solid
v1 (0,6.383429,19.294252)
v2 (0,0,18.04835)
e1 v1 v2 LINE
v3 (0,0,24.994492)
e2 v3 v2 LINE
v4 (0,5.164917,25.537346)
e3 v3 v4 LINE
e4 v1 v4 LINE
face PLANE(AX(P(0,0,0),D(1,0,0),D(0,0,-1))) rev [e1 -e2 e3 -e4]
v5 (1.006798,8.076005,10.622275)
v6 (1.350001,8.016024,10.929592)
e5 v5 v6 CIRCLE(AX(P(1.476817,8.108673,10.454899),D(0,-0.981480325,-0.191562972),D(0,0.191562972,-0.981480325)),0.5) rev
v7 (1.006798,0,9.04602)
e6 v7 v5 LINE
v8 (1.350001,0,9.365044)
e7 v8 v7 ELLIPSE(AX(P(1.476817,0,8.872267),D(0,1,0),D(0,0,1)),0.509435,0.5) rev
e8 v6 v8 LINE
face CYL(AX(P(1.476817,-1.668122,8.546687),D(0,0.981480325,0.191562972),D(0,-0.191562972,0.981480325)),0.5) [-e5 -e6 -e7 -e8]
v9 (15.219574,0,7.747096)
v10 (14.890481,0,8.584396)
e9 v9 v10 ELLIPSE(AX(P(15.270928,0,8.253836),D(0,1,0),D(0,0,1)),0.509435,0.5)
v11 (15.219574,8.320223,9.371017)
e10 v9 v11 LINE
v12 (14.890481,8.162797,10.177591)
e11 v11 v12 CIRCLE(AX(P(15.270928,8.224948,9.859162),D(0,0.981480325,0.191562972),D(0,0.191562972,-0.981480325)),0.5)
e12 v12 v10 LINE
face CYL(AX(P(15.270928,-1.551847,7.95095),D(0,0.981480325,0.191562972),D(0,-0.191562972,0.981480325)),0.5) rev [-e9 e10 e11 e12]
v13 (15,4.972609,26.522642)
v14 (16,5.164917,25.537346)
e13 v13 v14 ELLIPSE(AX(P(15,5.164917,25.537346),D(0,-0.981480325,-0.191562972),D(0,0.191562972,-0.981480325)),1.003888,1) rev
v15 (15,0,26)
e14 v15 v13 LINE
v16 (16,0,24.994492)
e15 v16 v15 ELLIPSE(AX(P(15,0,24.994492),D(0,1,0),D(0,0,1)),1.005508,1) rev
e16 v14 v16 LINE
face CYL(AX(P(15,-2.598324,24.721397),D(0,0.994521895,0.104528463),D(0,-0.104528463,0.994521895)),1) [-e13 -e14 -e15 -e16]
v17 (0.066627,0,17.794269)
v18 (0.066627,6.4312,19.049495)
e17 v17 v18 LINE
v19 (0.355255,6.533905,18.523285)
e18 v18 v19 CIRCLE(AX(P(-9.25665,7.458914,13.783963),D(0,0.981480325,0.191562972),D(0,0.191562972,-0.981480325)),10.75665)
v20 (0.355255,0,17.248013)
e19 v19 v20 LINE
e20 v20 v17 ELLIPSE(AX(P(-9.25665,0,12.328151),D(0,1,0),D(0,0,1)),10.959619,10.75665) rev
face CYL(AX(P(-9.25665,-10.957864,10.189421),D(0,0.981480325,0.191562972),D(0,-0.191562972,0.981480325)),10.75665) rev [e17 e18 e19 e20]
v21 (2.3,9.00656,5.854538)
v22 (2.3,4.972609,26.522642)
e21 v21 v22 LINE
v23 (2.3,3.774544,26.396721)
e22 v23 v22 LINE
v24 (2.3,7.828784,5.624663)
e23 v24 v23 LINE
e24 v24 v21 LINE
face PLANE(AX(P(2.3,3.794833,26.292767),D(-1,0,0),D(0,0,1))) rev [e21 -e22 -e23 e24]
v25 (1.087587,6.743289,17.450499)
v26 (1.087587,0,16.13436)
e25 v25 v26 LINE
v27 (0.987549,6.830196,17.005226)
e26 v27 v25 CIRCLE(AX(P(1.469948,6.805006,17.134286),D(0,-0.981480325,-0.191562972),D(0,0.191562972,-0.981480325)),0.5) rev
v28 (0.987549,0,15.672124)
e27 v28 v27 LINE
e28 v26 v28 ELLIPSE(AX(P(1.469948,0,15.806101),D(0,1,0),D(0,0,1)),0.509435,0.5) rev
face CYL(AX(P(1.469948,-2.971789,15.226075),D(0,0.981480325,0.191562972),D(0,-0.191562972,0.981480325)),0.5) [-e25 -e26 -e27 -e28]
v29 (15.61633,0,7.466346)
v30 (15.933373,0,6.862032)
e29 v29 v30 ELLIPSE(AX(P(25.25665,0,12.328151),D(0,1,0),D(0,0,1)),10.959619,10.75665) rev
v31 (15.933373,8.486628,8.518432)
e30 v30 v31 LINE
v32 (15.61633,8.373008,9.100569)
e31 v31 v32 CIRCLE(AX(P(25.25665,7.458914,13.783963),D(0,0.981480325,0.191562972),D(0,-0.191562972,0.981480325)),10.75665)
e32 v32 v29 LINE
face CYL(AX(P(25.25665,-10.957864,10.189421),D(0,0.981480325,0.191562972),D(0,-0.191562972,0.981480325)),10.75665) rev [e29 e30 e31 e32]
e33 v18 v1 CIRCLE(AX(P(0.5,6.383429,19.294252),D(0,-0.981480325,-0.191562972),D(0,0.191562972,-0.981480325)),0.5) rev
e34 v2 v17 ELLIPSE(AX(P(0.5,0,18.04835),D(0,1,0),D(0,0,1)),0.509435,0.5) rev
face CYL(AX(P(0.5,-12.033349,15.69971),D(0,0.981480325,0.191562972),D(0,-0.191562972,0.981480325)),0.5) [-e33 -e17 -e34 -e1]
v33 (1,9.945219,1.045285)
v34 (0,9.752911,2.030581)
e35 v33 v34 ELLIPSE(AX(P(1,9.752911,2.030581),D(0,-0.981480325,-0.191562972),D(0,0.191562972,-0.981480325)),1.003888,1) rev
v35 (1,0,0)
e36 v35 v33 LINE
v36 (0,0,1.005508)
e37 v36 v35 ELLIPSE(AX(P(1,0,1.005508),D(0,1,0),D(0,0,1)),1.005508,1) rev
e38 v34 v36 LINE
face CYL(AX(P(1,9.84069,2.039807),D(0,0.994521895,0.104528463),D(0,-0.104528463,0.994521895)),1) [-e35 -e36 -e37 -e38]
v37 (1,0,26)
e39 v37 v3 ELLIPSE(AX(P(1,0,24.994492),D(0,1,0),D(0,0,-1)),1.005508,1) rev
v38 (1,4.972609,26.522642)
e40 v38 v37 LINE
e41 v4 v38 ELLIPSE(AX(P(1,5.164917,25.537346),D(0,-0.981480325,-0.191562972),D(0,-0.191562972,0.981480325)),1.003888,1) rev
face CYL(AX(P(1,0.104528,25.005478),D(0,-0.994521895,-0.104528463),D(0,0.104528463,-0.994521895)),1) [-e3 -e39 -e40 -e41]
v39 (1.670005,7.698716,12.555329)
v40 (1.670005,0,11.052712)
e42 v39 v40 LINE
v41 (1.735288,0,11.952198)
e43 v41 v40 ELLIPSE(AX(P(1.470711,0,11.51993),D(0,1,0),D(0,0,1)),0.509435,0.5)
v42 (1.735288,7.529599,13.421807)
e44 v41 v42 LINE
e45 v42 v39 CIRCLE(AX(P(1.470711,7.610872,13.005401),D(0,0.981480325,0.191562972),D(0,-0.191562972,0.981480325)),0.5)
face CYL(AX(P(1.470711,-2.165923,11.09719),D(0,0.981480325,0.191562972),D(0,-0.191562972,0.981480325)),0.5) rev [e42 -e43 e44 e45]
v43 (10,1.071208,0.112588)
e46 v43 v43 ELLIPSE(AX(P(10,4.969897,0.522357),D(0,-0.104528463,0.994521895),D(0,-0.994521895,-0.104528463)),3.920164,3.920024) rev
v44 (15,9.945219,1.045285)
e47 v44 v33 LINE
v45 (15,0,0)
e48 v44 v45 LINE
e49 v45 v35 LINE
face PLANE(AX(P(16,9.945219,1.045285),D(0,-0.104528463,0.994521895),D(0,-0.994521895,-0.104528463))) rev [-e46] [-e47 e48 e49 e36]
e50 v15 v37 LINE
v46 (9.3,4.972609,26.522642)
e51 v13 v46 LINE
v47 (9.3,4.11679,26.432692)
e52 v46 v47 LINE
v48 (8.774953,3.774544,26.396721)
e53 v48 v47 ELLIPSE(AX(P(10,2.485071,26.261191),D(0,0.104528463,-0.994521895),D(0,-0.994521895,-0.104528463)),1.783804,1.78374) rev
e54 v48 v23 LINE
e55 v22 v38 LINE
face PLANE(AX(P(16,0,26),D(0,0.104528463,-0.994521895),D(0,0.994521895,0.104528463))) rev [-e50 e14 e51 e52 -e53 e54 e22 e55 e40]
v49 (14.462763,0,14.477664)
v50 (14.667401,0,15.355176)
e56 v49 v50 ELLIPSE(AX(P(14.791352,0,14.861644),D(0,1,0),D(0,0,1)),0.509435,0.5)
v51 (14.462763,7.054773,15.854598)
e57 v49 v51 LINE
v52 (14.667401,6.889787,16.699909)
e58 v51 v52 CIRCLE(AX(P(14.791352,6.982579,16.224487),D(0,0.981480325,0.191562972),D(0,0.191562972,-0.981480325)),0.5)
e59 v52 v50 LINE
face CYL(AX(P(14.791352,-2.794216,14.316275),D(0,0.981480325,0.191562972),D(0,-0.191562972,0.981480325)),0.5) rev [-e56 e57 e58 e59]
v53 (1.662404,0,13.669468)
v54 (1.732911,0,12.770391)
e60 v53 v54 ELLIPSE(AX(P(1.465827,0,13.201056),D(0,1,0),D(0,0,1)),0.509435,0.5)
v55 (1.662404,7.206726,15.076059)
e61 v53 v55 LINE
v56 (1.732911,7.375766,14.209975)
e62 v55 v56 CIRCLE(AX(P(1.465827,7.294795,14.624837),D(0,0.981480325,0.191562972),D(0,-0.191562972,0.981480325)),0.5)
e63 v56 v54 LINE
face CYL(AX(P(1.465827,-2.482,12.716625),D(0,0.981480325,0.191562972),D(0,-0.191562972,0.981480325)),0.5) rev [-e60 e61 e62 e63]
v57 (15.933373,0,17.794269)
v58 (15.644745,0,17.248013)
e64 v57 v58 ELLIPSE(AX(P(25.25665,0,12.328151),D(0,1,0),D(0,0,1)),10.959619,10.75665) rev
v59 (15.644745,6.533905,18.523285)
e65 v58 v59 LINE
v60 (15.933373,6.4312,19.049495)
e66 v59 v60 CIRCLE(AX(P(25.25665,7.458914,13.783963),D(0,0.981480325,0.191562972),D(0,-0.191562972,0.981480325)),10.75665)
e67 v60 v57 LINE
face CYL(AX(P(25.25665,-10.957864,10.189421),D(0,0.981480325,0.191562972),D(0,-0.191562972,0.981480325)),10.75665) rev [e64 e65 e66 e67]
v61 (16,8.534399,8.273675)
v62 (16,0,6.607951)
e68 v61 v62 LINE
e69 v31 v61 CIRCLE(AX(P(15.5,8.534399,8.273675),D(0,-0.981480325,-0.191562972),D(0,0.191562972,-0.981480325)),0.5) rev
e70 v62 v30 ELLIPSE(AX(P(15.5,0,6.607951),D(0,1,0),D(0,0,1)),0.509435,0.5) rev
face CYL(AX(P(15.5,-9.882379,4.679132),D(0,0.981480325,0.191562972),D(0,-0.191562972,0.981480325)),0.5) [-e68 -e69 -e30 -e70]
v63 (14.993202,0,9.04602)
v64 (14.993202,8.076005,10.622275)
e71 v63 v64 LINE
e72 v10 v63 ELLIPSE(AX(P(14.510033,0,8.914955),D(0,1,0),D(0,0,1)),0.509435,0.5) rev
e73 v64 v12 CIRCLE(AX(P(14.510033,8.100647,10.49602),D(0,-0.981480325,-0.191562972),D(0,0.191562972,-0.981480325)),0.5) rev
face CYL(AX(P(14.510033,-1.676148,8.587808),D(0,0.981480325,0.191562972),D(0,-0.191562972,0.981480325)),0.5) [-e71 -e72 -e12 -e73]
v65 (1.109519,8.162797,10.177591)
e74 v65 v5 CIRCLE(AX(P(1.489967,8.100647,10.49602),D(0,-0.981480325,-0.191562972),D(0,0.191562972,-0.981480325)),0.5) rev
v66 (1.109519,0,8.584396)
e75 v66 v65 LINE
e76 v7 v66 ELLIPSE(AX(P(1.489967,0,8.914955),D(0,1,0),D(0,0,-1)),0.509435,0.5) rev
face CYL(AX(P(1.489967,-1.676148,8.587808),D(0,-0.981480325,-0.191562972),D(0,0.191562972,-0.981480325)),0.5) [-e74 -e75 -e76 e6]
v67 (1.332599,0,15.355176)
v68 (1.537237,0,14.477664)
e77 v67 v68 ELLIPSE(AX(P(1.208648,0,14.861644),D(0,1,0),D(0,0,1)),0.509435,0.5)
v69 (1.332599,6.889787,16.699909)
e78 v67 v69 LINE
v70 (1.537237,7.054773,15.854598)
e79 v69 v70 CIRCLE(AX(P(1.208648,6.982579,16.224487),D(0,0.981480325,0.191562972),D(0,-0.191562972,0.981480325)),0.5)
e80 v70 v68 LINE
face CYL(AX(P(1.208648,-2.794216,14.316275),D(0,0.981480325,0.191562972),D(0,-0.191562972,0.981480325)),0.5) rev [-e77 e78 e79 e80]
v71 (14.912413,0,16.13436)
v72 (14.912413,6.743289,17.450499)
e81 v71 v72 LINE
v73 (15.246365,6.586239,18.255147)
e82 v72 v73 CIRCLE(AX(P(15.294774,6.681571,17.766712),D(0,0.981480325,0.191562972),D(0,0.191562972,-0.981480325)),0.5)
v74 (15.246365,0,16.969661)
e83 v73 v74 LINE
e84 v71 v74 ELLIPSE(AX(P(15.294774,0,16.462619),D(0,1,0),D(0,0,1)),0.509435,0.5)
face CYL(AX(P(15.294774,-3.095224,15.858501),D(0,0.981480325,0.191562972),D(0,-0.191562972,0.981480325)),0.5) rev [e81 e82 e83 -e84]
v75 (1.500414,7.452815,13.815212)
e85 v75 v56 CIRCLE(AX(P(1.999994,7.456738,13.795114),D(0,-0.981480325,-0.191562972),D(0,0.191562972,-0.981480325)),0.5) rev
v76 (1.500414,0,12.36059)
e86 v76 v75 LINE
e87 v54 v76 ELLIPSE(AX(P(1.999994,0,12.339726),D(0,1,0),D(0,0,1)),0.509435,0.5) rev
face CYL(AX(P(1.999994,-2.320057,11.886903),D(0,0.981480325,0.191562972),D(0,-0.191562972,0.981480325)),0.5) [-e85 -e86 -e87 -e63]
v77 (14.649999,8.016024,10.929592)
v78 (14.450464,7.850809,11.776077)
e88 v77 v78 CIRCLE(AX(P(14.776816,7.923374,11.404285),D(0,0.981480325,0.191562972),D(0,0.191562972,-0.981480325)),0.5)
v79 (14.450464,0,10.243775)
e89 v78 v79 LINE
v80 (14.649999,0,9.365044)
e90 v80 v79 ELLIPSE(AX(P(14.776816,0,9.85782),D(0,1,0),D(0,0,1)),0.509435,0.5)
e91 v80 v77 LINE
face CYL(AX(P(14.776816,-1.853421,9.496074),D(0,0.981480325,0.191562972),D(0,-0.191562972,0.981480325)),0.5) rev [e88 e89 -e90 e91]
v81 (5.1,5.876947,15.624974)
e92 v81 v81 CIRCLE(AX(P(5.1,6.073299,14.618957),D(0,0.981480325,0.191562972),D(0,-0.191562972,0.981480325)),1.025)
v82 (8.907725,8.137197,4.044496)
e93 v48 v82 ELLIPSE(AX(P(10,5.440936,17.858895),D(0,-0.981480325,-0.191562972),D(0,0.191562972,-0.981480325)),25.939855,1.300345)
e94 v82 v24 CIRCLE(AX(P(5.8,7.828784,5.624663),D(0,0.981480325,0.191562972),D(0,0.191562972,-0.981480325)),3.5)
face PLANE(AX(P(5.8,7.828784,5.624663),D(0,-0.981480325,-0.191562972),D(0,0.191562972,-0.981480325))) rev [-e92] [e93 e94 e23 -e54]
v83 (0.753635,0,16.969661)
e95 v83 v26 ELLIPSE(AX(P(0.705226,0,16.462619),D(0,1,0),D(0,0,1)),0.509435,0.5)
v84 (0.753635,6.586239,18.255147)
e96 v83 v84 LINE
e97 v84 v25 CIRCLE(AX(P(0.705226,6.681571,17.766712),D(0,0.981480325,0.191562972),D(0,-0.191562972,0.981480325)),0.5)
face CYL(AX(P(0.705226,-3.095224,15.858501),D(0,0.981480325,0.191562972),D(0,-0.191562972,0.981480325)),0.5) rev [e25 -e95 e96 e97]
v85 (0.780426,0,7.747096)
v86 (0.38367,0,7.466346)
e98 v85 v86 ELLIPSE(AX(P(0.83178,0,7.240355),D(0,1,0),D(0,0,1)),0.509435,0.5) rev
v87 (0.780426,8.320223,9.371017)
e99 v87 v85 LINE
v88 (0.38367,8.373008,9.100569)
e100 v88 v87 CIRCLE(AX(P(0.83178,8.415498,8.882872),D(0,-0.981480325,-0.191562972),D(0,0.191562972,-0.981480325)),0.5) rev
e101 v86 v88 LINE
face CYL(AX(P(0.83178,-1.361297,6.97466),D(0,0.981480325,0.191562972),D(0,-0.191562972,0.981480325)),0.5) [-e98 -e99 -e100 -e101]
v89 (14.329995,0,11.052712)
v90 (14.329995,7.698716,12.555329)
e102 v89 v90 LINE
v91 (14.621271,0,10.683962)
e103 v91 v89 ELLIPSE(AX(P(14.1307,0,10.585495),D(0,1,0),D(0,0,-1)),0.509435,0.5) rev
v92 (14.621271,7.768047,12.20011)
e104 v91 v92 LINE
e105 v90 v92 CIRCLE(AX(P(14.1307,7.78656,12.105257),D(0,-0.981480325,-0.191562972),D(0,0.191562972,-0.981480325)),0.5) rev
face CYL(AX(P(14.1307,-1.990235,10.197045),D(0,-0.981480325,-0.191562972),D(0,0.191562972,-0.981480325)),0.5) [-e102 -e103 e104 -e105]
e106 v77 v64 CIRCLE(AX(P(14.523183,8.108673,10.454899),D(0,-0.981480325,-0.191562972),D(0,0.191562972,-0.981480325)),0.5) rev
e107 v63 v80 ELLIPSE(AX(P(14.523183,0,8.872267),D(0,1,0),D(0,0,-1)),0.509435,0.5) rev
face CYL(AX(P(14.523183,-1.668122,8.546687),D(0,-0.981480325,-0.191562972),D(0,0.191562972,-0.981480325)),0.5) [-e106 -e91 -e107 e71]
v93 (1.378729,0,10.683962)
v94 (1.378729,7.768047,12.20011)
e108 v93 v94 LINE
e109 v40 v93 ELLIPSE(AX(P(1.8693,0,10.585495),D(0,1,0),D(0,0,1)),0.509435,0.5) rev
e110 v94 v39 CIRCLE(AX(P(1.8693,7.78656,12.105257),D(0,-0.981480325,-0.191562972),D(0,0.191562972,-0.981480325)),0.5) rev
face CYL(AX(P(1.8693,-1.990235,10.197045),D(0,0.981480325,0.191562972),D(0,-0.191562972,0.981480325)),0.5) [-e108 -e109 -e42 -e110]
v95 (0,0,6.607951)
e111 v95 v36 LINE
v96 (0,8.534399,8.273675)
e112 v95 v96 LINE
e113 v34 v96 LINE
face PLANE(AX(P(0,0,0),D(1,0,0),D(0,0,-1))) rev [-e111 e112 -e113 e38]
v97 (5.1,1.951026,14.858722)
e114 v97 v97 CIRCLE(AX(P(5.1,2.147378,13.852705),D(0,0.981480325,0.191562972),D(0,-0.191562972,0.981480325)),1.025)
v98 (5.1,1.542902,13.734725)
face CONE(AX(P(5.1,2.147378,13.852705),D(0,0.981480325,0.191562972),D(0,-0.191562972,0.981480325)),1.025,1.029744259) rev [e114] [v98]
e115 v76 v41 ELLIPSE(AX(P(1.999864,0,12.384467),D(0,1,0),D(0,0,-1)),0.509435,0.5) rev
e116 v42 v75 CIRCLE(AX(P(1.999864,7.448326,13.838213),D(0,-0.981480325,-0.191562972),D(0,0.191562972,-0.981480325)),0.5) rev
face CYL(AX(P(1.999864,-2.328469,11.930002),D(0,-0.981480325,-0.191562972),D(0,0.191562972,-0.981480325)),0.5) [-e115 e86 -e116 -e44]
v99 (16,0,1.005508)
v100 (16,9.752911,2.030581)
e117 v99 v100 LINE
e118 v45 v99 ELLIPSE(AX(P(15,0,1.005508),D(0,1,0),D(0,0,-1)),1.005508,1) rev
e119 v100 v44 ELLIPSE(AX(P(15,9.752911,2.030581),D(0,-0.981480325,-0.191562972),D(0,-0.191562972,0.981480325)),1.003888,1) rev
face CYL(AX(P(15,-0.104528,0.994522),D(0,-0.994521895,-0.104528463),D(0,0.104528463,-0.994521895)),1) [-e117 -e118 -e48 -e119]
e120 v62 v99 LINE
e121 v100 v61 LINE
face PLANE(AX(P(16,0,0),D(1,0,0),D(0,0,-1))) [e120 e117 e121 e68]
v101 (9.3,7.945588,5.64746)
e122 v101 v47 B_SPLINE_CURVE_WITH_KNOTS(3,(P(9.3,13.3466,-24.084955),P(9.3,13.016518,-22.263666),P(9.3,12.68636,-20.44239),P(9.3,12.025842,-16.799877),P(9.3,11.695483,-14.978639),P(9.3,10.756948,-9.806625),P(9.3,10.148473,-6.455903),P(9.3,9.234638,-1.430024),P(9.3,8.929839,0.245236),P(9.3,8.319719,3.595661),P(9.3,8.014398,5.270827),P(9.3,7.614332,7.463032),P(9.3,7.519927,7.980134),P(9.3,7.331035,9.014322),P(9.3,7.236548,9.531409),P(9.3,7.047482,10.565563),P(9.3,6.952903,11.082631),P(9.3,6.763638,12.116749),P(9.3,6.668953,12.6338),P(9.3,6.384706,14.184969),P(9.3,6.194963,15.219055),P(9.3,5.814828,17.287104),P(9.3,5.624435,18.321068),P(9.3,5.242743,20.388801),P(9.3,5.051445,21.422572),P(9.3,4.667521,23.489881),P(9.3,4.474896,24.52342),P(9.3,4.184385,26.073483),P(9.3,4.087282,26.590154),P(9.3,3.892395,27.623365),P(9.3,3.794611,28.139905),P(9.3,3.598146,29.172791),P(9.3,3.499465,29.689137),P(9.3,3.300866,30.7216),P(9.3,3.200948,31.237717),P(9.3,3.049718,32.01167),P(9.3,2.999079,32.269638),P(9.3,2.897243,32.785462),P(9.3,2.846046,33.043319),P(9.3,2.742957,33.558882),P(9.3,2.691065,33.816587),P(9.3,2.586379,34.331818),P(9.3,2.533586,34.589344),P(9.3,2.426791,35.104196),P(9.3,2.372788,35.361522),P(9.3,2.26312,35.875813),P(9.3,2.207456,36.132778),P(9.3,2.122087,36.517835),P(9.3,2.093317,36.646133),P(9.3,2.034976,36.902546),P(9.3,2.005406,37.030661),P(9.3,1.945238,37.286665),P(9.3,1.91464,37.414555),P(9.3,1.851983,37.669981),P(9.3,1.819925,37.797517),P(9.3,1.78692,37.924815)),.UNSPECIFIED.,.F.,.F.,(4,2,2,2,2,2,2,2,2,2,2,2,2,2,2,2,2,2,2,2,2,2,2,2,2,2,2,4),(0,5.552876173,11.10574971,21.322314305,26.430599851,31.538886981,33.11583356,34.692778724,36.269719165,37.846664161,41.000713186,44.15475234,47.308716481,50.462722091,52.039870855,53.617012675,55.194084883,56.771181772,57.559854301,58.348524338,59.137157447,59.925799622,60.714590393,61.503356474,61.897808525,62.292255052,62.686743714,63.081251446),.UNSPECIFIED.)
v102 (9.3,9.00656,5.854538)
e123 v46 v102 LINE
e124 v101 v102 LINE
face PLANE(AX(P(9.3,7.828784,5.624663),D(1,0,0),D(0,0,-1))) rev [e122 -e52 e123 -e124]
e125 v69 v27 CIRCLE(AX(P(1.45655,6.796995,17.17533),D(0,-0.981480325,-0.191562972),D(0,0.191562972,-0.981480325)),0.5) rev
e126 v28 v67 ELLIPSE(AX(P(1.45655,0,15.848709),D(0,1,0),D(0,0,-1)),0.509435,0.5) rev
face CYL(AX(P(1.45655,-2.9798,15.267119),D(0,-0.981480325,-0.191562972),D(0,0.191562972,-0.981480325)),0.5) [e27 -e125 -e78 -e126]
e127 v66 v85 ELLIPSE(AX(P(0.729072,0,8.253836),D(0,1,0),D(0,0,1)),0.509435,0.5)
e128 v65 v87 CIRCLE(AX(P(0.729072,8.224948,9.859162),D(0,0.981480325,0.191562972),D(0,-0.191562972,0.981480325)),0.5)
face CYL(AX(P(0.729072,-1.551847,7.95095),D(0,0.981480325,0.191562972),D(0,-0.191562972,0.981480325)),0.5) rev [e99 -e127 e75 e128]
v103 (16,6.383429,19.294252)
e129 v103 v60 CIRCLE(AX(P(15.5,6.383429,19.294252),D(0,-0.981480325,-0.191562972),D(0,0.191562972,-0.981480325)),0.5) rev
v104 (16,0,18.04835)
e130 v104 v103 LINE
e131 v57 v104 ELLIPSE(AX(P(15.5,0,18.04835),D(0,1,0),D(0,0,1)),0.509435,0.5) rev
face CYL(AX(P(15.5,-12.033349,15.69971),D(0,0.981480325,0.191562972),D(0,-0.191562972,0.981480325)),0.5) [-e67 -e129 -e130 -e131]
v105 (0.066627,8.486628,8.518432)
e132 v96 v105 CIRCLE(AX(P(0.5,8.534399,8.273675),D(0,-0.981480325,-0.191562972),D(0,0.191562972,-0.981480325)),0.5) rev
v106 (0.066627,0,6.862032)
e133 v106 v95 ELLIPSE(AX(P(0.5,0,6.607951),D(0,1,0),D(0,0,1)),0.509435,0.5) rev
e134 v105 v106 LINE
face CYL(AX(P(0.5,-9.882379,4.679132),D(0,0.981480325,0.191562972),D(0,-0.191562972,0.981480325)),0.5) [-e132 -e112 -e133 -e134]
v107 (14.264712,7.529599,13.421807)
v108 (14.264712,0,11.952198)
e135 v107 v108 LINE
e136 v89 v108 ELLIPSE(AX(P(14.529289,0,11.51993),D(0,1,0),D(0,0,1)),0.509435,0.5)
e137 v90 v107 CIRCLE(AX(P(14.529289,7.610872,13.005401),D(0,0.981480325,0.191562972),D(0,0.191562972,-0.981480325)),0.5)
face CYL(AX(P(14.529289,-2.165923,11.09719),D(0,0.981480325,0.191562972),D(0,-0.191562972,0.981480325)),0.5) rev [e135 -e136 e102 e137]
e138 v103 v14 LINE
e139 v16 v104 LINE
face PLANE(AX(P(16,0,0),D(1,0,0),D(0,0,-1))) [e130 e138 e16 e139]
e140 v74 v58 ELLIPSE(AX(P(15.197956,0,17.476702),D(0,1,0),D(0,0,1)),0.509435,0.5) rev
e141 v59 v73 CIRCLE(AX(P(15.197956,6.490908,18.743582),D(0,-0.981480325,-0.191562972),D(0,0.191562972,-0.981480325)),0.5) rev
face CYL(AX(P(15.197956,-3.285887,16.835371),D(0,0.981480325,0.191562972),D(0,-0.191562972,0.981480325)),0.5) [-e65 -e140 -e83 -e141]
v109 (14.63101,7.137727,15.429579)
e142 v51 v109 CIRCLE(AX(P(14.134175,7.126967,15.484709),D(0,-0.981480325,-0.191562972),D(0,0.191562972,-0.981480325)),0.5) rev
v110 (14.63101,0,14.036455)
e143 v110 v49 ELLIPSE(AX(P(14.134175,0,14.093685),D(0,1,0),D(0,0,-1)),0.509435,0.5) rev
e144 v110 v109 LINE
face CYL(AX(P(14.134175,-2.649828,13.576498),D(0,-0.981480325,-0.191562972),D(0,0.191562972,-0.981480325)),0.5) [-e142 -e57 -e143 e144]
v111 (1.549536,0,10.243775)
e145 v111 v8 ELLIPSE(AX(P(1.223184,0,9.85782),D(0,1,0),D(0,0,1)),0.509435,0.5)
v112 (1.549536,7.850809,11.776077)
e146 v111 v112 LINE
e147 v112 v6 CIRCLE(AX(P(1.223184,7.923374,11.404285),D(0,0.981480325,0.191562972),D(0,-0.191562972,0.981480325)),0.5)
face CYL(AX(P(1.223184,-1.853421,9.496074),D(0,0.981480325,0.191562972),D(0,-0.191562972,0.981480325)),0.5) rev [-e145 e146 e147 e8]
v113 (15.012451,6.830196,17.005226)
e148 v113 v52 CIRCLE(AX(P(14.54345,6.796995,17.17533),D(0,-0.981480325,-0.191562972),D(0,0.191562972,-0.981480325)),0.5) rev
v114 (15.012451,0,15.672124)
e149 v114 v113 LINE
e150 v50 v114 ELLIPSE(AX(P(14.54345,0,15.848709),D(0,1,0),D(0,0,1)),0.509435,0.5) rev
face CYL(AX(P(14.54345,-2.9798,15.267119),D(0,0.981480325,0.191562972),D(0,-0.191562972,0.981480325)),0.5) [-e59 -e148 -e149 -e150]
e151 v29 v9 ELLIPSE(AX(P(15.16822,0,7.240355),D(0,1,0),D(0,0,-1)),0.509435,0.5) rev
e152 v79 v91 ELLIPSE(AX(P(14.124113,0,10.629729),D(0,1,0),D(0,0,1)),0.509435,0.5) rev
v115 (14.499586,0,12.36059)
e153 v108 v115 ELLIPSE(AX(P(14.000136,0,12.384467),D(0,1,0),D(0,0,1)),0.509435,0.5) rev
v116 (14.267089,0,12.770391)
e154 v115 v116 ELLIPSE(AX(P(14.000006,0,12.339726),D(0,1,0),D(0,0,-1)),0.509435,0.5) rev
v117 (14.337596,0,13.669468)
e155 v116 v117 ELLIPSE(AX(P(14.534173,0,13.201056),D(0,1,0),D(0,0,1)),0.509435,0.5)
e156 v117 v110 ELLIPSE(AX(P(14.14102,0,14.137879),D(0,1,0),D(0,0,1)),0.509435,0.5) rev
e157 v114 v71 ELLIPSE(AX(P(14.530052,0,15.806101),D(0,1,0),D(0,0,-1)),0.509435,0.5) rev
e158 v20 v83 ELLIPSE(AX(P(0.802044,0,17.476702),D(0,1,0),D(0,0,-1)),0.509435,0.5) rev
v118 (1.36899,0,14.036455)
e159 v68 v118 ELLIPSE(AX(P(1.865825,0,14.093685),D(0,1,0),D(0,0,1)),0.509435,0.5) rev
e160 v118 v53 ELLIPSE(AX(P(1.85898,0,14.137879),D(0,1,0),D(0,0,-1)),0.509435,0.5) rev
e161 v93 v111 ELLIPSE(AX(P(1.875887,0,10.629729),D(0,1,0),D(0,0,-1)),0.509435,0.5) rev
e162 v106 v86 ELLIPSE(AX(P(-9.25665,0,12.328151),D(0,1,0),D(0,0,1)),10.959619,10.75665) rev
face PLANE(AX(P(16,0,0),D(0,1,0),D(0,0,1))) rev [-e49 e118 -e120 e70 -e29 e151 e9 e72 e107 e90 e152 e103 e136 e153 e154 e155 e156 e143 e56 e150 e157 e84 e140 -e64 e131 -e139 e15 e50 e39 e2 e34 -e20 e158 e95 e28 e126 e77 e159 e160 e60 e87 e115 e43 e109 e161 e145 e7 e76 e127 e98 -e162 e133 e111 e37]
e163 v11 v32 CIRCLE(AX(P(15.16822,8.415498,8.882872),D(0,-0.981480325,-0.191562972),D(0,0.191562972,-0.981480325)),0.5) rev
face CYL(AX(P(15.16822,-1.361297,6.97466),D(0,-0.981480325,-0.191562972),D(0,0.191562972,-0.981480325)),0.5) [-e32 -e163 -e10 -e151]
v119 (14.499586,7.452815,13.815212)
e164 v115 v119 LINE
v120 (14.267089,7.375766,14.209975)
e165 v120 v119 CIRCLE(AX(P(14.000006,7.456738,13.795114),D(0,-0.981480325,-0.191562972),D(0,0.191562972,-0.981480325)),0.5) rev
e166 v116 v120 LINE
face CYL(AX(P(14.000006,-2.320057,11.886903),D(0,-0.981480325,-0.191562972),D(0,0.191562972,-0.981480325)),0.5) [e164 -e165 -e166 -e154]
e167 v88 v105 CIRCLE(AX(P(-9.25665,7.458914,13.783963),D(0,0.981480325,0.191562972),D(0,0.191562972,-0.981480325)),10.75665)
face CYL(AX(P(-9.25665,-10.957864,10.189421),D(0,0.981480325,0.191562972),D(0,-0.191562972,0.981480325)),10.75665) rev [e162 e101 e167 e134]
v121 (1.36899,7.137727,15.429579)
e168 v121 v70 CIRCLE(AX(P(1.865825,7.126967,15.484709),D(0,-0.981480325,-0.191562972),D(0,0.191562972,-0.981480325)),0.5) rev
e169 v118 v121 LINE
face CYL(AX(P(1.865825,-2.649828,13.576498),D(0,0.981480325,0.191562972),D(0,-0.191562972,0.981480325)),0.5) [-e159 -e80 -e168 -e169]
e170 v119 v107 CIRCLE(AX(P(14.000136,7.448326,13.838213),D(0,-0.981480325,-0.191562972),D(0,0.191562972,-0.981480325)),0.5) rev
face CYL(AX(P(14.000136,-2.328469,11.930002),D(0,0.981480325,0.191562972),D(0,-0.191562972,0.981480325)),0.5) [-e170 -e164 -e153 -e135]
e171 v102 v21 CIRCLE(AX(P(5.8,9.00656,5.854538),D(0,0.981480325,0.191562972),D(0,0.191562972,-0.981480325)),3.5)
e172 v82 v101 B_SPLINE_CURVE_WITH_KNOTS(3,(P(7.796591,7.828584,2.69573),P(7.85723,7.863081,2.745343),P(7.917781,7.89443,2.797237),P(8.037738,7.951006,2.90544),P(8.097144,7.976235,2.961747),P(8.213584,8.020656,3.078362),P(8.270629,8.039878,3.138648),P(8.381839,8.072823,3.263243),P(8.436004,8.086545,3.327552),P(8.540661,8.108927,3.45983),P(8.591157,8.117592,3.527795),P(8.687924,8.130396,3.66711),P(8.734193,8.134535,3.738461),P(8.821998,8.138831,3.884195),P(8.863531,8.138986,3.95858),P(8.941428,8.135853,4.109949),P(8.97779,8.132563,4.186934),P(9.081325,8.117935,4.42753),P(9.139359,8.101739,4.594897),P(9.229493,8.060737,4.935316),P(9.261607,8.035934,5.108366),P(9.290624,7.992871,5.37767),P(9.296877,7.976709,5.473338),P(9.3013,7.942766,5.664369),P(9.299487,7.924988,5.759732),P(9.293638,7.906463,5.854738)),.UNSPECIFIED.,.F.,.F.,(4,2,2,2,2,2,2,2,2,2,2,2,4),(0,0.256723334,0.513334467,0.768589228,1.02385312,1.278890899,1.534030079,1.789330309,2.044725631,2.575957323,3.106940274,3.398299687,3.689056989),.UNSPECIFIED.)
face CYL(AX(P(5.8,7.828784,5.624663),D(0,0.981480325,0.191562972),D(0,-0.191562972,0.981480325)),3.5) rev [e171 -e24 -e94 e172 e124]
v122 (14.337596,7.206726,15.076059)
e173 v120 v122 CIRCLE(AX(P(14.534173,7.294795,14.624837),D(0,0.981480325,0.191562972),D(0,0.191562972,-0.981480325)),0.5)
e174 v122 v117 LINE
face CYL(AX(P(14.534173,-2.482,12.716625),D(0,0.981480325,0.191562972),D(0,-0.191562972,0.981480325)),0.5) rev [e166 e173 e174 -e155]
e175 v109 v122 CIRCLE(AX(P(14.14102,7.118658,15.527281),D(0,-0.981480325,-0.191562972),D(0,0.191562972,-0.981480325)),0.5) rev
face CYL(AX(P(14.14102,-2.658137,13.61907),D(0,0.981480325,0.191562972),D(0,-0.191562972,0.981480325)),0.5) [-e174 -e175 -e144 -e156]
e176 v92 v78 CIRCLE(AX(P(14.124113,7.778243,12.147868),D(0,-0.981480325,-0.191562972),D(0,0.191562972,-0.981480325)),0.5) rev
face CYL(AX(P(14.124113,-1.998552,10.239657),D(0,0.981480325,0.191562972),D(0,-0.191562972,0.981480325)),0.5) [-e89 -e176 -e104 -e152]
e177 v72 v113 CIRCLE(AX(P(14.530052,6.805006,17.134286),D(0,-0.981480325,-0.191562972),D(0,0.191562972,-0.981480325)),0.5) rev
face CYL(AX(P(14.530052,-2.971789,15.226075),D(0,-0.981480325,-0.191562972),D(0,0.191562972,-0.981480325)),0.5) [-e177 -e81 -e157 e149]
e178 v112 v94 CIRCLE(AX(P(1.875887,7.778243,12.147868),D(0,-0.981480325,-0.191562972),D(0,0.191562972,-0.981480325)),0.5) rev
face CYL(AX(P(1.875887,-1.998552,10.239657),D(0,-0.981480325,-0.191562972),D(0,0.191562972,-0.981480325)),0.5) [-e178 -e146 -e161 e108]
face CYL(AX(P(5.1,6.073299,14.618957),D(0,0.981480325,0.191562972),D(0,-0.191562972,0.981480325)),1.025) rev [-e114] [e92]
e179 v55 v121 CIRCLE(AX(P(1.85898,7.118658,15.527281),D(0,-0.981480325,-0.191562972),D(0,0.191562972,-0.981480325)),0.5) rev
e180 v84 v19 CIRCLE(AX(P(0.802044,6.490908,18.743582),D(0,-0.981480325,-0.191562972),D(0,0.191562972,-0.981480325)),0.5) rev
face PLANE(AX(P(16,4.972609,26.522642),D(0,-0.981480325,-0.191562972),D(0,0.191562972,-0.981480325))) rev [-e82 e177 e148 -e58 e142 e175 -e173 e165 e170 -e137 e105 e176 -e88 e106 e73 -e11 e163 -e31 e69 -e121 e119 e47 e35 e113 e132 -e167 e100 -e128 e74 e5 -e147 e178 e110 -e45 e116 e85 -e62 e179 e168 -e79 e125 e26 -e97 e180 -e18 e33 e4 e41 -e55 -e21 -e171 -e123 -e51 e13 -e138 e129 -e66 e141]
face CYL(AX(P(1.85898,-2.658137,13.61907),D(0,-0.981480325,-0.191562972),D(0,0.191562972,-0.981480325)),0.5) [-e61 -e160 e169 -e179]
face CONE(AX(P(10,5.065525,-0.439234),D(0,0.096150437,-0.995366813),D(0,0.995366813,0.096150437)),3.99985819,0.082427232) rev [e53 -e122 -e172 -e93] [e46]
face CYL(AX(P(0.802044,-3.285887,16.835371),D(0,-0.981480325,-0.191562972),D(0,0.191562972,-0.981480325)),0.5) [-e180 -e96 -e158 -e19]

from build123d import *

# Parameters (mm, degrees)
BOSS_EXTRUDE1_DEPTH          = 16
CUT_EXTRUDE1_REACH           = 32.943
CUT_EXTRUDE4_DEPTH           = 1.2
SKETCH6_W                    = 7.000000000000001
SKETCH6_H                    = 1.1999999999999869
CUT_EXTRUDE5_DEPTH           = 1.2
M2_5X0_45_TAPPED_HOLE2_D     = 2.05
M2_5X0_45_TAPPED_HOLE2_DEPTH = 4
M2_5X0_45_TAPPED_HOLE2_TIP   = 0.6158821345032492
SKETCH11_R                   = 0.5000000000000004
SKETCH11_R_2                 = 0.5000000000000009
SKETCH11_R_3                 = 0.49999999999999917
CUT_EXTRUDE6_DEPTH           = 31.9427848040178
FILLET1_R                    = 1
FILLET3_R                    = 0.5


with BuildPart() as part:
    # Sketch1 → Boss-Extrude1 (new body)
    with BuildSketch(Plane(origin=(0, 0, 0), x_dir=(0, 0, -1), z_dir=(1, 0, 0))):
        Polygon((0, 0), (-26, 0), (-26.522642316338285, 4.972609476841361), (-1.0452846326765777, 9.945218953682728), align=None)
    extrude(amount=BOSS_EXTRUDE1_DEPTH)

    # Cut-Extrude1: up to this plane
    cut_extrude1_end = Plane(origin=(16, 0, 0), z_dir=(0, 1, 0))
    # Sketch2 → Cut-Extrude1 (cut, up to the surface)
    with BuildSketch(Plane(origin=(0, 9.776794987365424, 1.9082113620630834), x_dir=(1, 0, 0), z_dir=(0, 0.9814803246385702, 0.19156297227639538)), mode=Mode.PRIVATE) as cut_extrude1_sk1:
        with BuildLine():
            Line((0, -6.62079059791211), (0, -17.578883739558876))
            ThreePointArc((0, -17.578883739558876), (1.5000000000000018, -12.099837168735492), (0, -6.62079059791211))
        make_face()
    cut_extrude1_tool1 = split(extrude(cut_extrude1_sk1.sketch, amount=-CUT_EXTRUDE1_REACH, mode=Mode.PRIVATE), bisect_by=cut_extrude1_end, keep=Keep.BOTH, mode=Mode.PRIVATE)
    add(cut_extrude1_tool1.solids().sort_by_distance((0.603737, 7.458914, 13.783963))[0], mode=Mode.SUBTRACT)
    # Sketch2 → Cut-Extrude1 (cut, up to the surface)
    with BuildSketch(Plane(origin=(0, 9.776794987365424, 1.9082113620630834), x_dir=(1, 0, 0), z_dir=(0, 0.9814803246385702, 0.19156297227639538)), mode=Mode.PRIVATE) as cut_extrude1_sk2:
        with BuildLine():
            Line((16, -6.62079059791211), (16, -17.578883739558876))
            ThreePointArc((16, -17.578883739558876), (14.499999999999998, -12.09983716873549), (16, -6.62079059791211))
        make_face()
    cut_extrude1_tool2 = split(extrude(cut_extrude1_sk2.sketch, amount=-CUT_EXTRUDE1_REACH, mode=Mode.PRIVATE), bisect_by=cut_extrude1_end, keep=Keep.BOTH, mode=Mode.PRIVATE)
    add(cut_extrude1_tool2.solids().sort_by_distance((15.396263, 7.458914, 13.783963))[0], mode=Mode.SUBTRACT)

    # Sketch3 → Cut-Revolve2 (revolve, cut)
    with BuildSketch(Plane(origin=(10, 0, 0), x_dir=(0, 0, -1), z_dir=(1, 0, 0)), mode=Mode.PRIVATE) as cut_revolve2_sk:
        Polygon((-27.256723261264806, 2.390150892266835), (-26.261321158169142, 2.486304738420681), (-0.5226423163382883, 4.972609476841364), (0.4727597867573756, 5.068763322995212), (0.05464593368674497, 9.046850904468306), (-27.43442164881982, 4.080838114392899), align=None)
    revolve(cut_revolve2_sk.sketch.rotate(Axis((10, 2.390150892266835, 27.256723261264806), (0, 0.09615043724968246, -0.9953668134997745)), 180), axis=Axis((10, 2.390150892266835, 27.256723261264806), (0, 0.09615043724968246, -0.9953668134997745)), mode=Mode.SUBTRACT)

    # Sketch4 → Cut-Extrude4 (cut)
    with BuildSketch(Plane(origin=(0, 9.776794987365424, 1.9082113620630834), x_dir=(1, 0, 0), z_dir=(0, 0.9814803246385702, 0.19156297227639538))):
        with BuildLine():
            Line((2.3, -25.078883739558876), (2.3, -4.02079059791211))
            ThreePointArc((2.3, -4.02079059791211), (5.8, -0.5207905979121099), (9.299999999999999, -4.02079059791211))
            Line((9.299999999999999, -4.02079059791211), (9.299999999999999, -25.078883739558876))
            Line((9.299999999999999, -25.078883739558876), (2.3, -25.078883739558876))
        make_face()
    extrude(amount=-CUT_EXTRUDE4_DEPTH, mode=Mode.SUBTRACT)

    # Sketch6 → Cut-Extrude5 (cut)
    with BuildSketch(Plane(origin=(0, -4.8041855105240625, 24.61443095427521), x_dir=(-1, 0, 0), z_dir=(0, 0.1915629722763954, -0.9814803246385702))):
        with Locations((-5.799999999999999, 9.36127455837256)):
            Rectangle(SKETCH6_W, SKETCH6_H)
    extrude(amount=-CUT_EXTRUDE5_DEPTH, mode=Mode.SUBTRACT)

    # M2.5x0.45 Tapped Hole2
    with Locations(Plane(origin=(5.1, 6.073299307, 14.618956627), x_dir=(0, -0.191562972276, 0.981480324639), z_dir=(0, 0.981480324639, 0.191562972276))):
        with Locations((0, 0)):
            Hole(M2_5X0_45_TAPPED_HOLE2_D / 2, depth=M2_5X0_45_TAPPED_HOLE2_DEPTH)
            with Locations((0, 0, -(M2_5X0_45_TAPPED_HOLE2_DEPTH + M2_5X0_45_TAPPED_HOLE2_TIP / 2))):  # 118° drill point
                Cone(0, M2_5X0_45_TAPPED_HOLE2_D / 2, M2_5X0_45_TAPPED_HOLE2_TIP, mode=Mode.SUBTRACT)

    # Sketch11 → Cut-Extrude6 (cut, through all)
    with BuildSketch(Plane(origin=(0, 9.776794987365424, 1.9082113620630834), x_dir=(1, 0, 0), z_dir=(0, 0.9814803246385702, 0.19156297227639538))):
        with Locations((0.7290719760898604, -8.100977766374406)):
            Circle(SKETCH11_R)
        with Locations((1.223184312982648, -9.67525633083825)):
            Circle(SKETCH11_R_2)
        with Locations((1.47071076557147, -11.306584211820118)):
            Circle(SKETCH11_R)
        with Locations((1.4658271457246748, -12.956576984609502)):
            Circle(SKETCH11_R)
        with Locations((1.208648362860844, -14.586411047833327)):
            Circle(SKETCH11_R)
        with Locations((0.7052257201809217, -16.15773712565332)):
            Circle(SKETCH11_R)
        with Locations((15.294774279819078, -16.15773712565332)):
            Circle(SKETCH11_R_3)
        with Locations((14.791351637139156, -14.586411047833327)):
            Circle(SKETCH11_R_2)
        with Locations((14.534172854275326, -12.956576984609502)):
            Circle(SKETCH11_R_2)
        with Locations((14.52928923442853, -11.306584211820118)):
            Circle(SKETCH11_R_3)
        with Locations((14.77681568701735, -9.67525633083825)):
            Circle(SKETCH11_R_3)
        with Locations((15.270928023910141, -8.100977766374406)):
            Circle(SKETCH11_R_2)
    extrude(amount=-CUT_EXTRUDE6_DEPTH, mode=Mode.SUBTRACT)

    # Fillet1
    fillet1_edges = [part.edges().sort_by_distance(p)[0] for p in [
        (16, 2.4863047384206807, 26.261321158169142),
        (16, 4.972609476841364, 0.5226423163382888),
        (0, 2.4863047384206807, 26.261321158169142),
        (0, 4.972609476841364, 0.5226423163382888),
    ]]
    fillet(fillet1_edges, radius=FILLET1_R)

    # Fillet3
    # the kernel refuses this fillet: 0.5 mm, written as the material it takes off along each edge
    with BuildSketch(Plane(origin=(-8.9e-16, 8.84027782449705, 8.471143317909705), x_dir=(6.568558896759944e-15, 0.19156297227639535, -0.9814803246385702), z_dir=(0, -0.9814803246385702, -0.19156297227639538))) as fillet3_piece_1:
        with BuildLine():
            CenterArc((0.13521663330723216, 0.5000000000000001), FILLET3_R, 240.08261327743668, 29.917386722562924)
            ThreePointArc((-0.11415875740879698, 0.06662727992497329), (-0.056977036870341, 0.0334889918096563), (0, 0))
            Line((0, 0), (0.13521663330722888, 0))
        make_face()
    extrude(amount=9.345127718950396, mode=Mode.SUBTRACT)
    with BuildSketch(Plane(origin=(0, 6.741112931801604, 19.22629613199286), x_dir=(0.5040667225652466, 0.16544617977427759, -0.8476699244401845), z_dir=(0, -0.9814803246385702, -0.19156297227639538))) as fillet3_piece_2:
        with BuildLine():
            CenterArc((0.13525152627151035, 0.4999905624749505), FILLET3_R, 239.73058109352934, 29.917386722571507)
            Line((-0.11678183501117555, 0.06815820518736707), (0, 0))
            ThreePointArc((0, 0), (0.06608974262947756, 0.00020303231598987), (0.13217948525895262, 0))
        make_face()
    extrude(amount=7.206353420577709, mode=Mode.SUBTRACT)
    with BuildSketch(Plane(origin=(0.9041123722790791, -0.8507763634373475, 8.564980938480485), x_dir=(0.8189747474071976, 0.1099244959567053, -0.5632024221343348), z_dir=(0, 0.9814803246385702, 0.19156297227639538))) as fillet3_piece_3:
        with BuildLine():
            CenterArc((0.3762150218917622, -0.48401816509794676), FILLET3_R, 104.52544984263686, 57.77038124776779)
            ThreePointArc((-0.10010465656917535, -0.3319669766419895), (-0.04871465560991424, -0.1663868635755278), (0, 0))
            ThreePointArc((0, 0), (0.1254050072972659, -0.01598183490205357), (0.250810014594537, -1e-17))
        make_face()
    extrude(amount=10.022391383047378, mode=Mode.SUBTRACT)
    with BuildSketch(Plane(origin=(0.5324558554564609, -0.8507763634373315, 7.6193895486969305), x_dir=(-0.4291086570829379, 0.17302980589976627, -0.8865249272788481), z_dir=(0, 0.9814803246385702, 0.19156297227639538))) as fillet3_piece_4:
        with BuildLine():
            CenterArc((0.35479045509600643, -0.49993505559679685), FILLET3_R, 90.92348148822464, 57.77038124776763)
            ThreePointArc((-0.07241113325413223, -0.24012973827030512), (-0.02090428833356213, -0.1246789702850145), (0, 0))
            ThreePointArc((0, 0), (0.1733659538719006, -0.00139716848681071), (0.3467319077437987, 3e-17))
        make_face()
    extrude(amount=10.203531680233258, mode=Mode.SUBTRACT)
    with BuildSketch(Plane(origin=(1.3245336837372133, -0.8507763634374137, 10.190626753655996), x_dir=(0.8971021301305255, 0.08463697149506566, -0.43364080893225093), z_dir=(0, 0.9814803246385702, 0.19156297227639538))) as fillet3_piece_5:
        with BuildLine():
            CenterArc((0.37621502189180767, -0.48401816509793244), FILLET3_R, 104.52544984264316, 57.770381247768)
            ThreePointArc((-0.10010465656914697, -0.331966976642029), (-0.0487146556099016, -0.16638686357554658), (0, 0))
            ThreePointArc((0, 0), (0.12540500729726603, -0.01598183490206699), (0.2508100145945294, 1e-17))
        make_face()
    extrude(amount=9.71097783882381, mode=Mode.SUBTRACT)
    with BuildSketch(Plane(origin=(1.0991916103360686, -0.8507763634374115, 9.198245722442355), x_dir=(-0.28591530273302007, 0.18356615547195718, -0.9405083233168811), z_dir=(0, 0.9814803246385702, 0.19156297227639538))) as fillet3_piece_6:
        with BuildLine():
            CenterArc((0.3547904550960354, -0.49993505559679685), FILLET3_R, 90.92348148822451, 57.770381247767844)
            ThreePointArc((-0.07241113325410303, -0.24012973827030598), (-0.02090428833353382, -0.12467897028501924), (0, 0))
            ThreePointArc((0, 0), (0.17336595387191708, -0.00139716848681245), (0.34673190774382884, 1e-17))
        make_face()
    extrude(amount=9.901081298793802, mode=Mode.SUBTRACT)
    with BuildSketch(Plane(origin=(1.4959844049493585, -0.8507763634373418, 11.862660417370378), x_dir=(0.9541210958561219, 0.05735797646647942, -0.2938758189745864), z_dir=(0, 0.9814803246385702, 0.19156297227639538))) as fillet3_piece_7:
        with BuildLine():
            CenterArc((0.3762150218917593, -0.4840181650979468), FILLET3_R, 104.52544984263653, 57.7703812477678)
            ThreePointArc((-0.10010465656917733, -0.33196697664198677), (-0.04871465560991481, -0.1663868635755268), (0, 0))
            ThreePointArc((0, 0), (0.12540500729726625, -0.01598183490205324), (0.25081001459453706, 2e-17))
        make_face()
    extrude(amount=9.390678100456343, mode=Mode.SUBTRACT)
    with BuildSketch(Plane(origin=(1.4222589744547673, -0.8507763634373324, 10.846840032195322), x_dir=(-0.13599448755852672, 0.18978327446134854, -0.972361973798041), z_dir=(0, 0.9814803246385702, 0.19156297227639538))) as fillet3_piece_8:
        with BuildLine():
            CenterArc((0.35479045509600565, -0.49993505559679685), FILLET3_R, 90.92348148822452, 57.7703812477678)
            ThreePointArc((-0.07241113325413356, -0.2401297382703053), (-0.02090428833355943, -0.12467897028501575), (0, 0))
            ThreePointArc((0, 0), (0.1733659538718988, -0.00139716848681048), (0.346731907743799, 0))
        make_face()
    extrude(amount=9.58527167273942, mode=Mode.SUBTRACT)
    with BuildSketch(Plane(origin=(1.414430376151146, -0.850776363437344, 13.541739715819348), x_dir=(0.9886900134979009, 0.028729373578601385, -0.14719606076013553), z_dir=(0, 0.9814803246385702, 0.19156297227639538))) as fillet3_piece_9:
        with BuildLine():
            CenterArc((0.376215021891753, -0.4840181650979482), FILLET3_R, 104.52544984263595, 57.7703812477681)
            ThreePointArc((-0.10010465656918284, -0.33196697664198593), (-0.04871465560991895, -0.16638686357552782), (0, 0))
            ThreePointArc((0, 0), (0.125405007297266, -0.01598183490205113), (0.2508100145945357, 0))
        make_face()
    extrude(amount=9.069028679357697, mode=Mode.SUBTRACT)
    with BuildSketch(Plane(origin=(1.4940563153884647, -0.8507763634373338, 12.526381781800541), x_dir=(0.017126217858494646, 0.19153487680335024, -0.9813363763918002), z_dir=(0, 0.9814803246385702, 0.19156297227639538))) as fillet3_piece_10:
        with BuildLine():
            CenterArc((0.3547904550960016, -0.499935055596797), FILLET3_R, 90.92348148822401, 57.770381247767745)
            ThreePointArc((-0.07241113325413433, -0.24012973827030146), (-0.0209042883335607, -0.12467897028501354), (0, 0))
            ThreePointArc((0, 0), (0.17336595387189982, -0.00139716848680998), (0.34673190774379936, 0))
        make_face()
    extrude(amount=9.263533663122749, mode=Mode.SUBTRACT)
    with BuildSketch(Plane(origin=(1.081790527629206, -0.8507763634373258, 15.188356654524544), x_dir=(0.9999954916879522, -0.0005752187838453385, 0.0029471557681415915), z_dir=(0, 0.9814803246385702, 0.19156297227639538))) as fillet3_piece_11:
        with BuildLine():
            CenterArc((0.3762150218917628, -0.4840181650979456), FILLET3_R, 104.52544984263676, 57.77038124776712)
            ThreePointArc((-0.10010465656917295, -0.33196697664198166), (-0.04871465560991308, -0.16638686357552615), (0, 0))
            ThreePointArc((0, 0), (0.12540500729726758, -0.01598183490205386), (0.25081001459453883, 0))
        make_face()
    extrude(amount=8.753597844378637, mode=Mode.SUBTRACT)
    with BuildSketch(Plane(origin=(1.3128942734078017, -0.8507763634373329, 14.197352095508087), x_dir=(0.16984395093157206, 0.18877974806829237, -0.967220367367864), z_dir=(0, 0.9814803246385702, 0.19156297227639538))) as fillet3_piece_12:
        with BuildLine():
            CenterArc((0.3547904550960046, -0.49993505559679674), FILLET3_R, 90.9234814882244, 57.77038124776759)
            ThreePointArc((-0.07241113325413241, -0.24012973827030312), (-0.02090428833355955, -0.12467897028501342), (0, 0))
            ThreePointArc((0, 0), (0.17336595387190104, -0.00139716848681042), (0.34673190774379903, 1e-17))
        make_face()
    extrude(amount=8.943437623243309, mode=Mode.SUBTRACT)
    with BuildSketch(Plane(origin=(0.5058917281388445, -0.8507763634373608, 16.76376706399826), x_dir=(0.9877715175165039, -0.029866276502300365, 0.15302102702253312), z_dir=(0, 0.9814803246385702, 0.19156297227639538))) as fillet3_piece_13:
        with BuildLine():
            CenterArc((0.3762150218917617, -0.4840181650979452), FILLET3_R, 104.52544984263687, 57.770381247768626)
            ThreePointArc((-0.10010465656917751, -0.3319669766419951), (-0.0487146556099147, -0.16638686357553534), (0, 0))
            ThreePointArc((0, 0), (0.12540500729726767, -0.01598183490205408), (0.2508100145945368, 0))
        make_face()
    extrude(amount=8.45180754378475, mode=Mode.SUBTRACT)
    with BuildSketch(Plane(origin=(0.8830355113666977, -0.8507763634373338, 15.820433779669933), x_dir=(0.3185653308355022, 0.1815827152187566, -0.9303460901855024), z_dir=(0, 0.9814803246385702, 0.19156297227639538))) as fillet3_piece_14:
        with BuildLine():
            CenterArc((0.35479045509600166, -0.4999350555967969), FILLET3_R, 90.92348148822403, 57.77038124776756)
            ThreePointArc((-0.07241113325413301, -0.2401297382703006), (-0.02090428833355908, -0.12467897028501372), (0, 0))
            ThreePointArc((0, 0), (0.17336595387190032, -0.00139716848680764), (0.3467319077437993, 0))
        make_face()
    extrude(amount=8.632515271577889, mode=Mode.SUBTRACT)
    with BuildSketch(Plane(origin=(16, 6.741112931801586, 19.226296131992857), x_dir=(-0.5040667225652338, 0.165446179774279, -0.8476699244401917), z_dir=(0, -0.9814803246385702, -0.19156297227639538))) as fillet3_piece_15:
        with BuildLine():
            CenterArc((0.1352515262715016, -0.49999056247495016), FILLET3_R, 90.35203218389827, 29.917386722570683)
            Line((-0.11678183501117242, -0.06815820518735785), (0, 0))
            ThreePointArc((0, 0), (0.06608974262948056, -0.00020303231598909), (0.13217948525895146, 2e-17))
        make_face()
    extrude(amount=7.206353420577674, mode=Mode.SUBTRACT)
    with BuildSketch(Plane(origin=(16, 8.840277824497045, 8.471143317909705), x_dir=(0, 0.19156297227639535, -0.98148032463857), z_dir=(0, -0.9814803246385702, -0.19156297227639538))) as fillet3_piece_16:
        with BuildLine():
            CenterArc((0.13521663330722677, -0.5), FILLET3_R, 90, 29.917386722563208)
            ThreePointArc((-0.11415875740880158, -0.06662727992497253), (-0.05697703687034154, -0.03348899180965503), (0, 0))
            Line((0, 0), (0.13521663330722677, 0))
        make_face()
    extrude(amount=9.345127718950387, mode=Mode.SUBTRACT)
    with BuildSketch(Plane(origin=(15.1169644886333, -0.8507763634373315, 15.820433779669933), x_dir=(-0.3185653308354956, 0.18158271521875696, -0.9303460901855045), z_dir=(0, 0.9814803246385702, 0.19156297227639538))) as fillet3_piece_17:
        with BuildLine():
            CenterArc((0.3547904550959971, 0.49993505559679646), FILLET3_R, 211.3061372640089, 57.77038124776749)
            ThreePointArc((-0.07241113325413587, 0.24012973827029624), (-0.02090428833356441, 0.12467897028501176), (0, 0))
            ThreePointArc((0, 0), (0.17336595387190015, 0.00139716848680865), (0.3467319077437984, 0))
        make_face()
    extrude(amount=8.632515271577885, mode=Mode.SUBTRACT)
    with BuildSketch(Plane(origin=(15.494108271861156, -0.8507763634373524, 16.76376706399826), x_dir=(-0.9877715175165045, -0.029866276502300025, 0.1530210270225314), z_dir=(0, 0.9814803246385702, 0.19156297227639538))) as fillet3_piece_18:
        with BuildLine():
            CenterArc((0.37621502189176137, 0.4840181650979457), FILLET3_R, 197.704168909595, 57.77038124776823)
            ThreePointArc((-0.10010465656917691, 0.33196697664199126), (-0.0487146556099134, 0.16638686357552773), (0, 0))
            ThreePointArc((0, 0), (0.12540500729726797, 0.01598183490205409), (0.25081001459453756, 0))
        make_face()
    extrude(amount=8.45180754378473, mode=Mode.SUBTRACT)
    with BuildSketch(Plane(origin=(14.687105726592199, -0.8507763634373378, 14.197352095508087), x_dir=(-0.16984395093157742, 0.18877974806829217, -0.9672203673678631), z_dir=(0, 0.9814803246385702, 0.19156297227639538))) as fillet3_piece_19:
        with BuildLine():
            CenterArc((0.35479045509600937, 0.4999350555967965), FILLET3_R, 211.30613726400765, 57.77038124776766)
            ThreePointArc((-0.07241113325412894, 0.2401297382703059), (-0.02090428833355873, 0.12467897028501487), (0, 0))
            ThreePointArc((0, 0), (0.17336595387190126, 0.00139716848681171), (0.34673190774380114, 1e-17))
        make_face()
    extrude(amount=8.943437623243318, mode=Mode.SUBTRACT)
    with BuildSketch(Plane(origin=(14.918209472370792, -0.8507763634373466, 15.18835665452454), x_dir=(-0.999995491687952, -0.0005752187838454116, 0.0029471557681419657), z_dir=(0, 0.9814803246385702, 0.19156297227639538))) as fillet3_piece_20:
        with BuildLine():
            CenterArc((0.3762150218917571, 0.48401816509794876), FILLET3_R, 197.7041689095957, 57.77038124776789)
            ThreePointArc((-0.100104656569179, 0.3319669766419887), (-0.04871465560991478, 0.16638686357552956), (0, 0))
            ThreePointArc((0, 0), (0.125405007297266, 0.01598183490205373), (0.2508100145945352, 0))
        make_face()
    extrude(amount=8.753597844378675, mode=Mode.SUBTRACT)
    with BuildSketch(Plane(origin=(14.505943684611536, -0.8507763634373342, 12.526381781800541), x_dir=(-0.017126217858495926, 0.19153487680335024, -0.9813363763918002), z_dir=(0, 0.9814803246385702, 0.19156297227639538))) as fillet3_piece_21:
        with BuildLine():
            CenterArc((0.35479045509600227, 0.49993505559679735), FILLET3_R, 211.30613726400827, 57.77038124776766)
            ThreePointArc((-0.07241113325413402, 0.24012973827030154), (-0.02090428833356055, 0.12467897028501357), (0, 0))
            ThreePointArc((0, 0), (0.17336595387190337, 0.00139716848680837), (0.3467319077437994, 0))
        make_face()
    extrude(amount=9.263533663122749, mode=Mode.SUBTRACT)
    with BuildSketch(Plane(origin=(14.585569623848851, -0.8507763634373453, 13.541739715819348), x_dir=(-0.9886900134979008, 0.02872937357860178, -0.14719606076013753), z_dir=(0, 0.9814803246385702, 0.19156297227639538))) as fillet3_piece_22:
        with BuildLine():
            CenterArc((0.3762150218917472, 0.4840181650979484), FILLET3_R, 197.7041689095961, 57.77038124776817)
            ThreePointArc((-0.1001046565691877, 0.33196697664198516), (-0.04871465560992195, 0.16638686357552743), (0, 0))
            ThreePointArc((0, 0), (0.12540500729726534, 0.01598183490205137), (0.2508100145945318, 0))
        make_face()
    extrude(amount=9.0690286793577, mode=Mode.SUBTRACT)
    with BuildSketch(Plane(origin=(14.577741025545231, -0.8507763634373329, 10.846840032195322), x_dir=(0.13599448755853047, 0.18978327446134843, -0.9723619737980406), z_dir=(0, 0.9814803246385702, 0.19156297227639538))) as fillet3_piece_23:
        with BuildLine():
            CenterArc((0.35479045509600415, 0.4999350555967963), FILLET3_R, 211.30613726400802, 57.77038124776766)
            ThreePointArc((-0.07241113325413258, 0.24012973827030282), (-0.02090428833356162, 0.12467897028501343), (0, 0))
            ThreePointArc((0, 0), (0.173365953871899, 0.00139716848680981), (0.34673190774379925, 0))
        make_face()
    extrude(amount=9.58527167273942, mode=Mode.SUBTRACT)
    with BuildSketch(Plane(origin=(14.504015595050639, -0.8507763634373409, 11.86266041737038), x_dir=(-0.9541210958561195, 0.05735797646648098, -0.2938758189745944), z_dir=(0, 0.9814803246385702, 0.19156297227639538))) as fillet3_piece_24:
        with BuildLine():
            CenterArc((0.3762150218917545, 0.48401816509794815), FILLET3_R, 197.70416890959598, 57.77038124776794)
            ThreePointArc((-0.10010465656918101, 0.3319669766419857), (-0.04871465560991879, 0.16638686357552568), (0, 0))
            ThreePointArc((0, 0), (0.12540500729726495, 0.01598183490205212), (0.2508100145945359, 0))
        make_face()
    extrude(amount=9.390678100456341, mode=Mode.SUBTRACT)
    with BuildSketch(Plane(origin=(14.90080838966393, -0.8507763634374079, 9.198245722442357), x_dir=(0.2859153027330282, 0.18356615547195673, -0.9405083233168786), z_dir=(0, 0.9814803246385702, 0.19156297227639538))) as fillet3_piece_25:
        with BuildLine():
            CenterArc((0.35479045509602963, 0.4999350555967975), FILLET3_R, 211.3061372640082, 57.77038124776777)
            ThreePointArc((-0.0724111332541061, 0.24012973827030268), (-0.0209042883335366, 0.12467897028501876), (0, 0))
            ThreePointArc((0, 0), (0.17336595387191572, 0.00139716848681119), (0.3467319077438275, 0))
        make_face()
    extrude(amount=9.901081298793795, mode=Mode.SUBTRACT)
    with BuildSketch(Plane(origin=(14.675466316262785, -0.8507763634374088, 10.190626753656), x_dir=(-0.8971021301305181, 0.08463697149506859, -0.433640808932266), z_dir=(0, 0.9814803246385702, 0.19156297227639538))) as fillet3_piece_26:
        with BuildLine():
            CenterArc((0.376215021891799, 0.4840181650979346), FILLET3_R, 197.7041689095896, 57.77038124776823)
            ThreePointArc((-0.10010465656915297, 0.33196697664202507), (-0.0487146556099036, 0.16638686357554403), (0, 0))
            ThreePointArc((0, 0), (0.1254050072972662, 0.01598183490206527), (0.25081001459452906, 0))
        make_face()
    extrude(amount=9.7109778388238, mode=Mode.SUBTRACT)
    with BuildSketch(Plane(origin=(15.467544144543528, -0.8507763634374061, 7.619389548696939), x_dir=(0.42910865708294166, 0.17302980589976596, -0.8865249272788464), z_dir=(0, 0.9814803246385702, 0.19156297227639538))) as fillet3_piece_27:
        with BuildLine():
            CenterArc((0.35479045509603263, 0.49993505559679774), FILLET3_R, 211.30613726400813, 57.770381247767546)
            ThreePointArc((-0.07241113325410442, 0.24012973827030298), (-0.0209042883335355, 0.12467897028501611), (0, 0))
            ThreePointArc((0, 0), (0.17336595387191303, 0.00139716848681047), (0.3467319077438274, 1e-17))
        make_face()
    extrude(amount=10.2035316802334, mode=Mode.SUBTRACT)
    with BuildSketch(Plane(origin=(15.095887627720929, -0.850776363437399, 8.56498093848045), x_dir=(-0.8189747474072521, 0.10992449595669035, -0.5632024221342583), z_dir=(0, 0.9814803246385702, 0.19156297227639538))) as fillet3_piece_28:
        with BuildLine():
            CenterArc((0.3762150218918041, 0.48401816509793455), FILLET3_R, 197.70416890958984, 57.77038124776749)
            ThreePointArc((-0.10010465656914745, 0.3319669766420232), (-0.04871465560990263, 0.16638686357554305), (0, 0))
            ThreePointArc((0, 0), (0.12540500729726536, 0.01598183490206698), (0.25081001459452973, 0))
        make_face()
    extrude(amount=10.022391383047495, mode=Mode.SUBTRACT)


solid = part.part
